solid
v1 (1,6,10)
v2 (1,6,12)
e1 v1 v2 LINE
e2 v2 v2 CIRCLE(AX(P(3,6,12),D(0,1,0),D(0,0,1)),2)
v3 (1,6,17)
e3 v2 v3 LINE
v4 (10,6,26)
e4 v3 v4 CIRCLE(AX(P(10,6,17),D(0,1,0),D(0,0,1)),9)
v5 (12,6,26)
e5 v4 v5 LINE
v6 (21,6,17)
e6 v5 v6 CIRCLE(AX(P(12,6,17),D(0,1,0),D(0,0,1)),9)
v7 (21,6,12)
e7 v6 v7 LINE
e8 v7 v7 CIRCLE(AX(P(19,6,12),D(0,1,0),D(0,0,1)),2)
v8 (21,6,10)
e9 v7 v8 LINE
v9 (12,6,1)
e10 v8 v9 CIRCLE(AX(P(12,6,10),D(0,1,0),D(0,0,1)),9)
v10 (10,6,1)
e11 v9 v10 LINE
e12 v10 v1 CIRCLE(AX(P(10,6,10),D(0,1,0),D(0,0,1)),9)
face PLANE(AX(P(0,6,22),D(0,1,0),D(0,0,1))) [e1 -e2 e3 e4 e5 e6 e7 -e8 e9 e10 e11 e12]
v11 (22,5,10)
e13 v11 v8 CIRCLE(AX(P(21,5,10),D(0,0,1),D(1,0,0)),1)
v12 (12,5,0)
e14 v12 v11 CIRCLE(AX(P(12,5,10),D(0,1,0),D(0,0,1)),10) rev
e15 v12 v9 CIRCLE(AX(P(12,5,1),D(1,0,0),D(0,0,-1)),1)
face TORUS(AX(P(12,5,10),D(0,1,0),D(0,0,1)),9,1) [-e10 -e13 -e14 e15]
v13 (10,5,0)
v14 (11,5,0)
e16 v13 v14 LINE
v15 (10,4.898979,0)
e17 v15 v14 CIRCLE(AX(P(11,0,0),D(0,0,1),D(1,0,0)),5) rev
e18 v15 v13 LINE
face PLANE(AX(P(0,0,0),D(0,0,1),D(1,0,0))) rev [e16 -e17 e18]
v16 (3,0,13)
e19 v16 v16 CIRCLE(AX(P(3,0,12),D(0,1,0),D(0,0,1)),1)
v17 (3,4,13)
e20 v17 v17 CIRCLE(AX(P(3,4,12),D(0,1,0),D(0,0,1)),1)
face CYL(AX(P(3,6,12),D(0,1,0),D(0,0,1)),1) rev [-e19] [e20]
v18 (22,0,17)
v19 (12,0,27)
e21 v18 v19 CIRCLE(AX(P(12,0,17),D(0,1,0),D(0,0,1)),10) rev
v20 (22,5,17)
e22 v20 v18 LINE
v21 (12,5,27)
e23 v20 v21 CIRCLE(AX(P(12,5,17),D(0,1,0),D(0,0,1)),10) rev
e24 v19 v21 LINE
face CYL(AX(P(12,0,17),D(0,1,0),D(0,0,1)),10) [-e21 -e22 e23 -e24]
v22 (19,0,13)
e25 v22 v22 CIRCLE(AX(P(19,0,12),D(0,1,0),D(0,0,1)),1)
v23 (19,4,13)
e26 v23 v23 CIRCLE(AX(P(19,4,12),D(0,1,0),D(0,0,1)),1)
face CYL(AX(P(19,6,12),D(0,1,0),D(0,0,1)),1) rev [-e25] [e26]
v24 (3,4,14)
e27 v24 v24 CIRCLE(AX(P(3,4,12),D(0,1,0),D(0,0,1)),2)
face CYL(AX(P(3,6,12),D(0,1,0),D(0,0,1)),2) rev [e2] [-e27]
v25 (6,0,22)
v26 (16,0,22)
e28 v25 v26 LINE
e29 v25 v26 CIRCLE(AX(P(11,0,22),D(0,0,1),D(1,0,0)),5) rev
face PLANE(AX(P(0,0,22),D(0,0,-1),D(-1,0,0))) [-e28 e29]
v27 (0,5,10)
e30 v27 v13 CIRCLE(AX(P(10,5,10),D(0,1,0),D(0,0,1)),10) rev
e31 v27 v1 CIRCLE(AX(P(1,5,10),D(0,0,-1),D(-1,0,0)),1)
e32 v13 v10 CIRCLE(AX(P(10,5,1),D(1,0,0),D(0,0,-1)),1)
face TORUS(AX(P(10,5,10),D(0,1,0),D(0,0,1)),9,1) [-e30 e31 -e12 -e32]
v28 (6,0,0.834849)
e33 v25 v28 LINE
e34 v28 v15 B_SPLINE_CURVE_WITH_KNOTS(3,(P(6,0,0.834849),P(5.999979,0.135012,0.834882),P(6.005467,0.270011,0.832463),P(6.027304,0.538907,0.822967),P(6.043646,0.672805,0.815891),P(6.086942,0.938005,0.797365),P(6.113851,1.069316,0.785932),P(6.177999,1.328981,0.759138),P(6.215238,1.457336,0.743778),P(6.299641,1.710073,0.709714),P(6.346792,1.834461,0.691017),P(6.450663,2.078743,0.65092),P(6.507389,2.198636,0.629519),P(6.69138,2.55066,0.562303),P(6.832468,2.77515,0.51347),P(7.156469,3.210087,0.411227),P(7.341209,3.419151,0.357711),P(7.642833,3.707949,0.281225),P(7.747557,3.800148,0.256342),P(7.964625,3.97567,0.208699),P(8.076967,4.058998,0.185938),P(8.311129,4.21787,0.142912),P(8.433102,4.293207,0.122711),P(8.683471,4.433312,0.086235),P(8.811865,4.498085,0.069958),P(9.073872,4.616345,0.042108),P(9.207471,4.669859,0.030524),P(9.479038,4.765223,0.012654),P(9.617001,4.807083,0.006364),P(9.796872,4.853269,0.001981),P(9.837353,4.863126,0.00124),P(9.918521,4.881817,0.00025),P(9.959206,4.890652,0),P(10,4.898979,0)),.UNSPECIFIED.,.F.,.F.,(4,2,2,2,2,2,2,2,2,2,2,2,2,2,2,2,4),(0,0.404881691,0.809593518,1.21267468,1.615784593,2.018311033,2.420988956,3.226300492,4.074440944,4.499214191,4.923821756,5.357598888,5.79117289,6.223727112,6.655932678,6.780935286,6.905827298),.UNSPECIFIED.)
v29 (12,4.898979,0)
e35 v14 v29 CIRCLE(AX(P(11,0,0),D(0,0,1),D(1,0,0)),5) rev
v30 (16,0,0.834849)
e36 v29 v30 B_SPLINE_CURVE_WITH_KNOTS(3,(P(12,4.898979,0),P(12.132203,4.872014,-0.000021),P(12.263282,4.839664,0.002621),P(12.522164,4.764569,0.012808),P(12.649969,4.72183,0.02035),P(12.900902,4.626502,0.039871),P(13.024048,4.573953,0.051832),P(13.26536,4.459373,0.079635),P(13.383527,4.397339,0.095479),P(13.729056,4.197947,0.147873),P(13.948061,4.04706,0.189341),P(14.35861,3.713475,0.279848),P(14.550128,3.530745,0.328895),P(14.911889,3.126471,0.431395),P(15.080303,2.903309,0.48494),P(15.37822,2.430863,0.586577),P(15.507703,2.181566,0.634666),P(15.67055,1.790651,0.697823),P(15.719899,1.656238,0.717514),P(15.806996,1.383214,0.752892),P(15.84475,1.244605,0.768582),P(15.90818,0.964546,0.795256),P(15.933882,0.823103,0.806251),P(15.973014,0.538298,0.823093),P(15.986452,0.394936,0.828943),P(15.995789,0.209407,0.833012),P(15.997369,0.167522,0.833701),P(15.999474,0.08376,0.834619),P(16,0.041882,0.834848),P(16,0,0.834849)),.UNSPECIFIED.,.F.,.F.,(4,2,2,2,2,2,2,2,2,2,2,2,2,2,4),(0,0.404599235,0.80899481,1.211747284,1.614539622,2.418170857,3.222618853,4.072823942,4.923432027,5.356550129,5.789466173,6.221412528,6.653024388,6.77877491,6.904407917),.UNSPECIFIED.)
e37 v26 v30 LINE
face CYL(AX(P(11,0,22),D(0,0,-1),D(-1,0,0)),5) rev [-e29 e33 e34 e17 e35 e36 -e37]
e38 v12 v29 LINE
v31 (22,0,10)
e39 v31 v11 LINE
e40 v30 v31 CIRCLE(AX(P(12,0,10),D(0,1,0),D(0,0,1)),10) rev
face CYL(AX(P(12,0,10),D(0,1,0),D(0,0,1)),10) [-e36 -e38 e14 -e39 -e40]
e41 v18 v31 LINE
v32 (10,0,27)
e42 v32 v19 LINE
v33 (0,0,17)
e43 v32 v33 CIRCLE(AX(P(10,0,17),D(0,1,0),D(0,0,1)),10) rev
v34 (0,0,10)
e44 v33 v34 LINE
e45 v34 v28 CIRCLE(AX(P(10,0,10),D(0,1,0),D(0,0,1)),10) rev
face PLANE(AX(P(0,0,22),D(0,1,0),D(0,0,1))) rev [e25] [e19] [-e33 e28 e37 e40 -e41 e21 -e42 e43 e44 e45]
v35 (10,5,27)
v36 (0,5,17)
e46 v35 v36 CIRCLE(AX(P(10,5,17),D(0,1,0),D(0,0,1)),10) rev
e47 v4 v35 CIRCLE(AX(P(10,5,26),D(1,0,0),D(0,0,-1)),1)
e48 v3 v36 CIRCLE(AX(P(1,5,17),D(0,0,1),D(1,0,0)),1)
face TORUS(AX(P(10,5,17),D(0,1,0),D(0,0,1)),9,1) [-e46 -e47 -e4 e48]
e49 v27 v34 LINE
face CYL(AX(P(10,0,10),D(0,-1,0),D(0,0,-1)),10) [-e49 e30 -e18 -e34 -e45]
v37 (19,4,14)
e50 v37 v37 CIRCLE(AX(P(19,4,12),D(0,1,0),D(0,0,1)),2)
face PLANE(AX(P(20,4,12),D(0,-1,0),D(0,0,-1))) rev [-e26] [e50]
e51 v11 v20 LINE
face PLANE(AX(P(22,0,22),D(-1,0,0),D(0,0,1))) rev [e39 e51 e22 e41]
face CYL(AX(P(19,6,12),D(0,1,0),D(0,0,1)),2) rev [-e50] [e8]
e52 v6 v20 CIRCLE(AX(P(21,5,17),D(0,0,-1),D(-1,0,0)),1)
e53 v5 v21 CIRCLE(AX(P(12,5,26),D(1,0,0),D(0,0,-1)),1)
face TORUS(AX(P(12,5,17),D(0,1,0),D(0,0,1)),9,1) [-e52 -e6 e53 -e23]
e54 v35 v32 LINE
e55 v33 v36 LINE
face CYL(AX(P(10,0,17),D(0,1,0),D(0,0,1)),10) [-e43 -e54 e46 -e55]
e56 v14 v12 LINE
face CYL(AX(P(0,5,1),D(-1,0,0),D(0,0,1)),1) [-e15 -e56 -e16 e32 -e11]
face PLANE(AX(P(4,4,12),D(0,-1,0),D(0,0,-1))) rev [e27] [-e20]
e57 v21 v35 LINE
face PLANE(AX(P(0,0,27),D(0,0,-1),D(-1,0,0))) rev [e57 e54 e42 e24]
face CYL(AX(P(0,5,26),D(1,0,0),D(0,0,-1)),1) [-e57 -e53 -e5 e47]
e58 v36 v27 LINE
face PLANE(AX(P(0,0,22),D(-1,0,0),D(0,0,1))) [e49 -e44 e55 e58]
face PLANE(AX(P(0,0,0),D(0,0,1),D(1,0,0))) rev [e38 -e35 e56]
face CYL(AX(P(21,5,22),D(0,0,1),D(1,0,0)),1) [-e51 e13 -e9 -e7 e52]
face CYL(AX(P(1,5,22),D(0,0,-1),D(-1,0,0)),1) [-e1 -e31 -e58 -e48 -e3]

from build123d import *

# Parameters (mm, degrees)
BOSS_EXTRU_1_DEPTH                                 = 22
ESQUISSE2_W                                        = 22
ESQUISSE2_H                                        = 6
BOSS_EXTRU_2_DEPTH                                 = 5
CHAMBRAGE_POUR_VIS_T_TE_HEXAGONALE_M21_D           = 2
CHAMBRAGE_POUR_VIS_T_TE_HEXAGONALE_M21_CBORE_D     = 4
CHAMBRAGE_POUR_VIS_T_TE_HEXAGONALE_M21_CBORE_DEPTH = 2
CONG_1_R                                           = 10
CONG_2_R                                           = 1


# Some blends are built 0.0001 mm under size
with BuildPart() as part:
    # Esquisse1 → Boss.-Extru.1 (new body)
    with BuildSketch(Plane.XY):
        with BuildLine():
            Line((0, 6), (0, 0))
            Line((0, 0), (6, 0))
            ThreePointArc((6, 0), (11, 5), (16, 0))
            Line((16, 0), (22, 0))
            Line((22, 0), (22, 6))
            Line((22, 6), (0, 6))
        make_face()
    extrude(amount=BOSS_EXTRU_1_DEPTH)

    # Esquisse2 → Boss.-Extru.2 (add)
    with BuildSketch(Plane.XY.offset(22)):
        with Locations((11, 3)):
            Rectangle(ESQUISSE2_W, ESQUISSE2_H)
    extrude(amount=BOSS_EXTRU_2_DEPTH)

    # Chambrage pour vis à tête hexagonale M21 (through all)
    with Locations(Plane(origin=(0, 6, 0), x_dir=(1, 0, 0), z_dir=(0, 1, 0))):
        with Locations((19, -12), (3, -12)):
            CounterBoreHole(CHAMBRAGE_POUR_VIS_T_TE_HEXAGONALE_M21_D / 2, CHAMBRAGE_POUR_VIS_T_TE_HEXAGONALE_M21_CBORE_D / 2, CHAMBRAGE_POUR_VIS_T_TE_HEXAGONALE_M21_CBORE_DEPTH)

    # Congé1
    # the kernel refuses this fillet: 10 mm, written as the material it takes off along each edge
    with BuildSketch(Plane(origin=(0, 31, 0), x_dir=(0, 0, 1), z_dir=(0, -1, 0)), Plane(origin=(22, -25, 27), x_dir=(-1, 0, 0), z_dir=(0, 1, 0))) as cong_1_piece_1:
        with BuildLine():
            CenterArc((CONG_1_R, -CONG_1_R), CONG_1_R, 90, 90)
            Line((0, -CONG_1_R), (0, 0))
            Line((0, 0), (CONG_1_R, 0))
        make_face()
    extrude(amount=56, mode=Mode.SUBTRACT)
    with BuildSketch(Plane(origin=(0, 31, 27), x_dir=(0, 0, -1), z_dir=(0, -1, 0)), Plane(origin=(22, -25, 0), x_dir=(-1, 0, 0), z_dir=(0, 1, 0))) as cong_1_piece_2:
        with BuildLine():
            CenterArc((CONG_1_R, CONG_1_R), CONG_1_R, 180, 90)
            Line((0, CONG_1_R), (0, 0))
            Line((0, 0), (CONG_1_R, 0))
        make_face()
    extrude(amount=56, mode=Mode.SUBTRACT)

    # Congé2
    cong_2_edges = [part.edges().sort_by_distance(p)[0] for p in [
        (11, 6, 0),
        (0, 6, 13.5),
        (11, 6, 27),
        (22, 6, 13.5),
        (19.071067812, 6, 24.071067812),
        (19.071067812, 6, 2.928932188),
        (2.928932188, 6, 24.071067812),
        (2.928932188, 6, 2.928932188),
    ]]
    fillet(cong_2_edges, radius=CONG_2_R - 0.0001)  # a hair under: the kernel refuses the full size


solid = part.part
